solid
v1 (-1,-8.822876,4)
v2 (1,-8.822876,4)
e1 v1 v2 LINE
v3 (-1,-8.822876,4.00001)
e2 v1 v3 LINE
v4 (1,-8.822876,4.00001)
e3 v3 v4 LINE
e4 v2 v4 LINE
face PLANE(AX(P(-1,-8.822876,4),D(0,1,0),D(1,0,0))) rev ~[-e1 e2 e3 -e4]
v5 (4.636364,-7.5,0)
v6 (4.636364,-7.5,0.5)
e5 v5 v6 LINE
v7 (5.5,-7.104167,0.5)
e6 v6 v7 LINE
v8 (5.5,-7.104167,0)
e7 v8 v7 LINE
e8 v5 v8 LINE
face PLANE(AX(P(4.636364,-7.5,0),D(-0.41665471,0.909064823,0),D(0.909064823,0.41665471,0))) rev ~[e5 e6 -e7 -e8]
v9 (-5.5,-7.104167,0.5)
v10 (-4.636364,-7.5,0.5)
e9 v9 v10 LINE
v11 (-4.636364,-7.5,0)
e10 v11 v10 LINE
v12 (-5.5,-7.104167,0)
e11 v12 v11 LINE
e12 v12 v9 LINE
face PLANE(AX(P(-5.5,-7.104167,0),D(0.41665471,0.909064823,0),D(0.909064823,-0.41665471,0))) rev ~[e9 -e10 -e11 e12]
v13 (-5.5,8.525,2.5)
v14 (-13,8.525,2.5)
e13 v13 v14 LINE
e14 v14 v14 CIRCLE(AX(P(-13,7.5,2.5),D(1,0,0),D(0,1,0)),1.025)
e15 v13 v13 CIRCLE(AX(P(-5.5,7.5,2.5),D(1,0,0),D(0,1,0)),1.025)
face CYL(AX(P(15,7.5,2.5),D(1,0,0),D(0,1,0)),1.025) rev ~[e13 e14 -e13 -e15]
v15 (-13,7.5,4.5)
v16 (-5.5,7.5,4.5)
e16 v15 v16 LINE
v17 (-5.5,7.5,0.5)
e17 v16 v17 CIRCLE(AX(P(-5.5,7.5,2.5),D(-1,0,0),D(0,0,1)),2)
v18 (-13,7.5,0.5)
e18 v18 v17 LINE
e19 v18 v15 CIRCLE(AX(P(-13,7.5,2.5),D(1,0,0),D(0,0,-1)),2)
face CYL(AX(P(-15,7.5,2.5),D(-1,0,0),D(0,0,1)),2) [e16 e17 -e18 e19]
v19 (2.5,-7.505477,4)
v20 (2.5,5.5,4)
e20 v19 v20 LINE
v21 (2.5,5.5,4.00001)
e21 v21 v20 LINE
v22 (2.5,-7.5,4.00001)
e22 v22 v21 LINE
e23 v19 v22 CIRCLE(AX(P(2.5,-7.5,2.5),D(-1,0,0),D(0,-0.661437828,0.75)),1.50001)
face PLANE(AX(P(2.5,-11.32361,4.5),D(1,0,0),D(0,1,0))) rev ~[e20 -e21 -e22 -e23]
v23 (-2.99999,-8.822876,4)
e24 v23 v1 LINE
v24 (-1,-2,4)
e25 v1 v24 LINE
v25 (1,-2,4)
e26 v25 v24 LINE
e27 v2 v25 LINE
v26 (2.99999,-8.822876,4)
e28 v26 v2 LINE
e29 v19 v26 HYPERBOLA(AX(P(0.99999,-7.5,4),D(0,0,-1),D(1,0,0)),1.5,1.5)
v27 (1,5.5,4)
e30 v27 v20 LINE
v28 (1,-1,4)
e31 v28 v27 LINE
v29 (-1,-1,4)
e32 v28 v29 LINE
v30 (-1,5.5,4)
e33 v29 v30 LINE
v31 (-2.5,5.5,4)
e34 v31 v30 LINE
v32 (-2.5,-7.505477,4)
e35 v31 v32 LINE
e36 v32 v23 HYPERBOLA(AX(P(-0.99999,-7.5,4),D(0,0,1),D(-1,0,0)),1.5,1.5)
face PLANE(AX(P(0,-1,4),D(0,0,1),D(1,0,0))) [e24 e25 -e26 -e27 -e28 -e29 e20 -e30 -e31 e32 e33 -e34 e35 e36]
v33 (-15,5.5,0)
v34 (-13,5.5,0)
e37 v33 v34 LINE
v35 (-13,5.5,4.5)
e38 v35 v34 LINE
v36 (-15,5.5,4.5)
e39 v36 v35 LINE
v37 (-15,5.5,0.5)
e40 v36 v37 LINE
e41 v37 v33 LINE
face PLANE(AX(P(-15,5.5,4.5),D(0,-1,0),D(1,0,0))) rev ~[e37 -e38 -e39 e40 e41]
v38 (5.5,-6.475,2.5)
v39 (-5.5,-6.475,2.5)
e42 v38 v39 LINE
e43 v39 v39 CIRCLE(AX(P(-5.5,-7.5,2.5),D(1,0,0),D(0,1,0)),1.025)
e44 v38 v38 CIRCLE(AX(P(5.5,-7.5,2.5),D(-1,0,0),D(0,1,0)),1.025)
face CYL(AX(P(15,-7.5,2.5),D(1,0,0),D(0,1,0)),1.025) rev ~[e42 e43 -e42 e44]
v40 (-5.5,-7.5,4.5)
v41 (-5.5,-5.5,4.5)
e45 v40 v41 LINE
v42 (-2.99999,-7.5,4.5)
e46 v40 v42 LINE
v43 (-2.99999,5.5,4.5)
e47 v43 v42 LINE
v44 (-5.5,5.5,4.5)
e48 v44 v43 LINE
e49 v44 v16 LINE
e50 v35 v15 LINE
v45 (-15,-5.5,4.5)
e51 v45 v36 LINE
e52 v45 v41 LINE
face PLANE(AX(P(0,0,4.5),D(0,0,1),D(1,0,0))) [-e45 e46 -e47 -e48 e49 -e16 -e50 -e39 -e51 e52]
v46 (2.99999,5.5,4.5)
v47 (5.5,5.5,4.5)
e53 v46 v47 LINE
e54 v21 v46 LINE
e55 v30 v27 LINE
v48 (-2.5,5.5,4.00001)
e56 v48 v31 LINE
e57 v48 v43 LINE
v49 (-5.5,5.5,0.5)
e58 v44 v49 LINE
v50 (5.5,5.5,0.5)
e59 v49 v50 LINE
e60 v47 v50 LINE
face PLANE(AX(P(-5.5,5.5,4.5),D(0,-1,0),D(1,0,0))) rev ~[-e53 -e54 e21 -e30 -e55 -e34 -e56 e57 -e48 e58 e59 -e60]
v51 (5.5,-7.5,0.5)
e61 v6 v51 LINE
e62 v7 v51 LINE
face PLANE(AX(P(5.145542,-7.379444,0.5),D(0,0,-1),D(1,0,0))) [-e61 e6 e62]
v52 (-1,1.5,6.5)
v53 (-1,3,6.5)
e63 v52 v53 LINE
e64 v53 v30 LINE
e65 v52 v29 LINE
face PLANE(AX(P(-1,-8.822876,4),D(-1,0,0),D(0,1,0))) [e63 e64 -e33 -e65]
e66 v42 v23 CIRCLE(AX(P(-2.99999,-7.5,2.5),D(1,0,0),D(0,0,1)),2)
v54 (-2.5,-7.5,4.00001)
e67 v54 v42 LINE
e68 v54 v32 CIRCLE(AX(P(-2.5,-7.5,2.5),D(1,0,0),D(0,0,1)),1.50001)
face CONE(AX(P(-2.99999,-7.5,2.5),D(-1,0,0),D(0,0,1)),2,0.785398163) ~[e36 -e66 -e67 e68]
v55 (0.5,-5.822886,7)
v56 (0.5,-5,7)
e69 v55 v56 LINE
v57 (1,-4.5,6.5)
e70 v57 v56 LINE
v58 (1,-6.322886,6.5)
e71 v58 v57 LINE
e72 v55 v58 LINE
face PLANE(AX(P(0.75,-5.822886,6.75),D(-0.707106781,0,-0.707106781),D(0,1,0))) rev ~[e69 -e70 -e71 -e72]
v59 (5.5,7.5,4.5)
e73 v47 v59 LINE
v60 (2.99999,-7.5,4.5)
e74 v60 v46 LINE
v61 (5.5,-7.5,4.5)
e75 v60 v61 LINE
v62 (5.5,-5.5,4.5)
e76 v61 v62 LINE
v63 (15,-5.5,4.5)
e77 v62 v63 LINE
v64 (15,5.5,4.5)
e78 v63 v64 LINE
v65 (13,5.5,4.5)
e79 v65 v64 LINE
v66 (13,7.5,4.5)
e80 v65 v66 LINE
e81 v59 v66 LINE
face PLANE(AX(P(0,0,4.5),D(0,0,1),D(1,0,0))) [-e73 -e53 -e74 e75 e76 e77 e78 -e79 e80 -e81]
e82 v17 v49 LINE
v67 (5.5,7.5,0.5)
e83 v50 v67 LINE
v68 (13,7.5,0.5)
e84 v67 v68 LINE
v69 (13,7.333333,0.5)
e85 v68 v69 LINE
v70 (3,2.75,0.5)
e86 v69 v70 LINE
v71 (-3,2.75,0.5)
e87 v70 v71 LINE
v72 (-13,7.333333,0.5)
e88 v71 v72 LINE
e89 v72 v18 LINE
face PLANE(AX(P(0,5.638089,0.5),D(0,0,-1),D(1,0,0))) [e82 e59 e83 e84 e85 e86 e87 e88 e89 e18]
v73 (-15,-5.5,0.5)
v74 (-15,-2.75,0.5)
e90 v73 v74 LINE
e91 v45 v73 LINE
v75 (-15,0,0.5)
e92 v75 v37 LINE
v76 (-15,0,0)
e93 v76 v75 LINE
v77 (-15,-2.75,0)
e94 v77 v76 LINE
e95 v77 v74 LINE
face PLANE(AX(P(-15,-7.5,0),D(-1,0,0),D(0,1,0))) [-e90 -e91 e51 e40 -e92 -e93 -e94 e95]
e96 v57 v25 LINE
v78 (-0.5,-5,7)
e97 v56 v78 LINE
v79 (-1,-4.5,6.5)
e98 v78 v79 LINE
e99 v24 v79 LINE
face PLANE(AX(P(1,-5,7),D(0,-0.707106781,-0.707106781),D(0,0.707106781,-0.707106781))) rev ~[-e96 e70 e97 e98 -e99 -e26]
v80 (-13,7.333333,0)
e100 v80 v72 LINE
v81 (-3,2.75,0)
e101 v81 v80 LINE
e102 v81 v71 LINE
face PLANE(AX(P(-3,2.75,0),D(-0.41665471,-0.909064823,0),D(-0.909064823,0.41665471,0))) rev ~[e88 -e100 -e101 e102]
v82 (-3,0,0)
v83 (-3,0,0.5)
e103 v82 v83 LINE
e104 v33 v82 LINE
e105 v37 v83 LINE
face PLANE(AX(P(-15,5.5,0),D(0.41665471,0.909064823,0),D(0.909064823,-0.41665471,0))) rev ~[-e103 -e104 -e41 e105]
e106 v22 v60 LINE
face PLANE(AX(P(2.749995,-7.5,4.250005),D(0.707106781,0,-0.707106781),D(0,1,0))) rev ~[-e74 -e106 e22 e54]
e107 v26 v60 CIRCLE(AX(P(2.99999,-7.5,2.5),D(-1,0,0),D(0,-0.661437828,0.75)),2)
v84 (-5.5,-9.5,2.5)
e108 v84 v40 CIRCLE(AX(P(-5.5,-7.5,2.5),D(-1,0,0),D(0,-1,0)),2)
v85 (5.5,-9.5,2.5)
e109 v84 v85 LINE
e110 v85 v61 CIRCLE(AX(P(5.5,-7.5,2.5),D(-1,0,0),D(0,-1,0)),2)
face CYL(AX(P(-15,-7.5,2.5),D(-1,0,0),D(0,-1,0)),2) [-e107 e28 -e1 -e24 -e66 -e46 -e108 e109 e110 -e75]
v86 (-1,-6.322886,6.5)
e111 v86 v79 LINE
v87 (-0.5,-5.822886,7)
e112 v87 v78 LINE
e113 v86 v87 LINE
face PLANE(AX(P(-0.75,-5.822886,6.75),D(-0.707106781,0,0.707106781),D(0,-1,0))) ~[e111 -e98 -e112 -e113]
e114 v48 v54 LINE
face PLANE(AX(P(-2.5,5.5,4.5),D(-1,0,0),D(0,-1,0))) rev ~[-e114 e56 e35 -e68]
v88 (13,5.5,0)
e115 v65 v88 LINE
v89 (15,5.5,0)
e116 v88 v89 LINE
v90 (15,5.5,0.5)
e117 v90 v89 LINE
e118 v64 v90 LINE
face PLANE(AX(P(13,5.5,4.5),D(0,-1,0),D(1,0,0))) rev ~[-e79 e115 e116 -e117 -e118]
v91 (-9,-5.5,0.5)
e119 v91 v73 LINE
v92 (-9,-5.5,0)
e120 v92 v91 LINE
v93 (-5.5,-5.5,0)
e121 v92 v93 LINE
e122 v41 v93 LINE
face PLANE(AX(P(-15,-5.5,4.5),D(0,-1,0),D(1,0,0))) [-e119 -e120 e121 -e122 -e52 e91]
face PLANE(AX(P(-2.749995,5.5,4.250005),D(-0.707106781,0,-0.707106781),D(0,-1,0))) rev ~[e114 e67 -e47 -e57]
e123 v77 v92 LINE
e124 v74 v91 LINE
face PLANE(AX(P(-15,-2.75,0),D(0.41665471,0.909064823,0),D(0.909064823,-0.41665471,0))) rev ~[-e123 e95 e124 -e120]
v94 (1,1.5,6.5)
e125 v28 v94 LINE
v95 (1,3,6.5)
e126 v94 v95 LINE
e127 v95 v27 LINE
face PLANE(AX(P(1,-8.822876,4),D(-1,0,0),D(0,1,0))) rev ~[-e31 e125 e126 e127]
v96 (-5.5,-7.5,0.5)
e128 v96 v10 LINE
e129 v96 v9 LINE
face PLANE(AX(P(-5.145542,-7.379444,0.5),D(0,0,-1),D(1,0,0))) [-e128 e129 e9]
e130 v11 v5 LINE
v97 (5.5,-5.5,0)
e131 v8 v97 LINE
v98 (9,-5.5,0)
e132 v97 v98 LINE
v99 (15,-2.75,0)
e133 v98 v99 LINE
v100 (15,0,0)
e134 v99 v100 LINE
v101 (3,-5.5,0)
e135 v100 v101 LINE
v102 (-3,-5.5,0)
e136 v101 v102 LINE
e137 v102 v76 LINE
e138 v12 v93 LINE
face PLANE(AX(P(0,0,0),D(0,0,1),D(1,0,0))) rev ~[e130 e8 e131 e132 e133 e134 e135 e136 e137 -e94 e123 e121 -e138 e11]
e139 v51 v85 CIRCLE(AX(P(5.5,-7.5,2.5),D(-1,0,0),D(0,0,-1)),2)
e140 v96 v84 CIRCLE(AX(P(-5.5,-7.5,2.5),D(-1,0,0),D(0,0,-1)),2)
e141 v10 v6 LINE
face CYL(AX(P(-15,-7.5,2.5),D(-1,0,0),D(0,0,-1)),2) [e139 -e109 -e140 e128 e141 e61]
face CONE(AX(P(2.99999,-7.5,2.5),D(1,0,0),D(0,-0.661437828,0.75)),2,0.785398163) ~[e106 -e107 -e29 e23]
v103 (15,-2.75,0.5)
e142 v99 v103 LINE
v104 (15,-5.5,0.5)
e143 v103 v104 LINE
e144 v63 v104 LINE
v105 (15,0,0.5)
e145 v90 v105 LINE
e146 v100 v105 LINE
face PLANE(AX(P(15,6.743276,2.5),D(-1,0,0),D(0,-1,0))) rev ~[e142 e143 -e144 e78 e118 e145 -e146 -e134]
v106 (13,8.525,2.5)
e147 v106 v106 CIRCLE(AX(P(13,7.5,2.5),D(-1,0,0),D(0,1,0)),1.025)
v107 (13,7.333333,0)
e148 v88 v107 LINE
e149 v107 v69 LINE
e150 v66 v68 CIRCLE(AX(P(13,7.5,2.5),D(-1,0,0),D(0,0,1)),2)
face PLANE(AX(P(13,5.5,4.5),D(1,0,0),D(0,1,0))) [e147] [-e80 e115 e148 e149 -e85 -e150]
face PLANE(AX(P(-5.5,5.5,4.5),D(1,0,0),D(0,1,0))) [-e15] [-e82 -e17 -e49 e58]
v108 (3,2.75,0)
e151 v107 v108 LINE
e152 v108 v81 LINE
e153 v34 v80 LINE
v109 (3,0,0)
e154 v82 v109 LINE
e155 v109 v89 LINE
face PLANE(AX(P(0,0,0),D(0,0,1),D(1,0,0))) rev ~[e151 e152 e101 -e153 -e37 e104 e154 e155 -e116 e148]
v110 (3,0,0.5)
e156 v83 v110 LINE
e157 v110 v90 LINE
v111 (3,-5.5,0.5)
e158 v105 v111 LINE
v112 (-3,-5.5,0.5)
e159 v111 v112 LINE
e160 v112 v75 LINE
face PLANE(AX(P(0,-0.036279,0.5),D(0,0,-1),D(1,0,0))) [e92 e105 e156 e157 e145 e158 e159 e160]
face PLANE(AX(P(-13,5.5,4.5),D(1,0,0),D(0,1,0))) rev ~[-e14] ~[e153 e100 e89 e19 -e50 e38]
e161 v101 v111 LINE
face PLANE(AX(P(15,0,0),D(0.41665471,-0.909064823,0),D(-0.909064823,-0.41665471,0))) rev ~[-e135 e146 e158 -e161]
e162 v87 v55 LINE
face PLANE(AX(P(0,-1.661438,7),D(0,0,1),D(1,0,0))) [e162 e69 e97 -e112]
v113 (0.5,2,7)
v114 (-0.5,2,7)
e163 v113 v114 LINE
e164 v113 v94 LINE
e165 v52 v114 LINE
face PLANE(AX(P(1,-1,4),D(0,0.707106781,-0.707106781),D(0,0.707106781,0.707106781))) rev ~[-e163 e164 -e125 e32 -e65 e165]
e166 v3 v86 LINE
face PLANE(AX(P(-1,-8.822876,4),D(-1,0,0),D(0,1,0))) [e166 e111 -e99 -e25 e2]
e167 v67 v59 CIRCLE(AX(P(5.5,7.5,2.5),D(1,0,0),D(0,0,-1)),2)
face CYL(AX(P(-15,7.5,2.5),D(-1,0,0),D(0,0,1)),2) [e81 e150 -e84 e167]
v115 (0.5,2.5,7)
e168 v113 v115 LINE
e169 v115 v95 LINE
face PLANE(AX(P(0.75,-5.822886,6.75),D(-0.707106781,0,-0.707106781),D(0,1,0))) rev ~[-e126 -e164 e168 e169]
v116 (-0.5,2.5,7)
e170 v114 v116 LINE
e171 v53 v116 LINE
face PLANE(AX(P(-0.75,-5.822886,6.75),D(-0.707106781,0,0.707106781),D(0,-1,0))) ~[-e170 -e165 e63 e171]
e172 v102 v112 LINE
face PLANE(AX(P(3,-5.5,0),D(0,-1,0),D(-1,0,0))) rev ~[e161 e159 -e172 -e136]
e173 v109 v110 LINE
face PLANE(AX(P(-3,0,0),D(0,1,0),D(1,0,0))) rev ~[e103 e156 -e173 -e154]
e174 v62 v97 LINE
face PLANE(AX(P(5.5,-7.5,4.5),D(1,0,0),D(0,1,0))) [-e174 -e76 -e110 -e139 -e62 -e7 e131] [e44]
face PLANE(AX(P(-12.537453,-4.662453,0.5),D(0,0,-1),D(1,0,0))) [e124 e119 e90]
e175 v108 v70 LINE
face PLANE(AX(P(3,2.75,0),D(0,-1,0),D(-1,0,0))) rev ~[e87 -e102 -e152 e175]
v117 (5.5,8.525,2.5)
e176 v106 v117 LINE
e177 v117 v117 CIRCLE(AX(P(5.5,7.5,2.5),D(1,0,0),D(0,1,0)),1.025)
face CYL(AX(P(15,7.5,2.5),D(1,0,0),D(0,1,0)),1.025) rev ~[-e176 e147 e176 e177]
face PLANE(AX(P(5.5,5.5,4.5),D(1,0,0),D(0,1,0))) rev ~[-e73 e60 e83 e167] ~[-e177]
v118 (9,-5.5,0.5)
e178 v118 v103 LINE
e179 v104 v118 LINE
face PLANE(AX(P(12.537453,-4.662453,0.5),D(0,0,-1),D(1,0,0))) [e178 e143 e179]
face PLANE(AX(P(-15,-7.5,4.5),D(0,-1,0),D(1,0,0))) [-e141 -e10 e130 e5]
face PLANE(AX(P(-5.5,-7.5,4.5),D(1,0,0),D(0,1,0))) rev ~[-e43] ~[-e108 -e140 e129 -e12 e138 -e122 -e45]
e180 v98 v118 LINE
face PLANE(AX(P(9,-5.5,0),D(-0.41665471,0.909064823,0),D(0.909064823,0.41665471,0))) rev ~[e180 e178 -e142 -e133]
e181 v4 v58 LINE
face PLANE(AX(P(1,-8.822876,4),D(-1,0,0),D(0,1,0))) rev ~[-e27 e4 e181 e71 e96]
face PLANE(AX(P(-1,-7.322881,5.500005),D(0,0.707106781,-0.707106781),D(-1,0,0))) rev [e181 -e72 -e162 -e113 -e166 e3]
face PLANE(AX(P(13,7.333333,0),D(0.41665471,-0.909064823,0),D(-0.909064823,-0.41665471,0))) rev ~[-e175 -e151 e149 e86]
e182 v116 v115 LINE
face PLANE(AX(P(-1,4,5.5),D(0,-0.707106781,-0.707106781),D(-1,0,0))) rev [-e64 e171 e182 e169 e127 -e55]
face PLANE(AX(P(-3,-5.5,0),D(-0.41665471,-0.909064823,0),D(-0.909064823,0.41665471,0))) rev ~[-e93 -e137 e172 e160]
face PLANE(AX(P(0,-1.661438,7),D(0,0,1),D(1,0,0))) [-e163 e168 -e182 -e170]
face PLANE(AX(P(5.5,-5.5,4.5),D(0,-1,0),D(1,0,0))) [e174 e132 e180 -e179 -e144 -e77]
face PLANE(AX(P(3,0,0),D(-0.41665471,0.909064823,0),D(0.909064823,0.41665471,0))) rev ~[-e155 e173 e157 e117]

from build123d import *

# Parameters (mm, degrees)
F0_W      = 30
F0_H      = 15
F1_DEPTH  = 4.5
F3_DEPTH  = 30
F4_W      = 9.5
F4_H      = 2
F4_W_2    = 2
F4_W_3    = 11
F5_DEPTH  = 25
F6_R      = 1.025
F7_DEPTH  = 30
F8_W      = 9.5
F8_H      = 2
F9_DEPTH  = 25
F10_W     = 11
F10_H     = 2
F11_DEPTH = 25
F12_W     = 2
F12_H     = 2
F13_DEPTH = 25
F15_DEPTH = 0.5
F16_W     = 5
F16_H     = 13
F16_H_2   = 3.8236103207
F17_DEPTH = 0.5
F18_W     = 2
F18_H     = 14.3228756555
F19_DEPTH = 3
F20_SIZE  = 2.99999
F21_SIZE  = 3
F22_SIZE  = 0.5
F23_SIZE  = 0.49999
F25_DEPTH = 3


# Not quite as in the source:
# - a fillet or chamfer is up to 0.001 mm smaller than in the source, because OpenCascade refuses the exact size
# - a feature names something its author has since deleted; it is built from what else it names


with BuildPart() as f1:
    # F0 (on Top) → F1 (new body)
    with BuildSketch(Plane.XY):
        Rectangle(F0_W, F0_H)
    extrude(amount=F1_DEPTH)

    # F2 (on face) → F3 (join)
    with BuildSketch(Plane(origin=(-15, 0, 0), x_dir=(0, -1, 0), z_dir=(-1, 0, 0))):
        with BuildLine():
            ThreePointArc((-7.5, 0.5), (-6.0857864376, 1.0857864376), (-5.5, 2.5))
            ThreePointArc((-5.5, 2.5), (-6.0857864376, 3.9142135624), (-7.5, 4.5))
            Line((-7.5, 4.5), (-7.5, 0.5))
        make_face()
        with BuildLine():
            Line((-7.5, 0.5), (-7.5, 4.5))
            ThreePointArc((-7.5, 4.5), (-9.5, 2.5), (-7.5, 0.5))
        make_face()
        with BuildLine():
            ThreePointArc((9.5, 2.5), (8.9142135624, 3.9142135624), (7.5, 4.5))
            Line((7.5, 4.5), (7.5, 0.5))
            ThreePointArc((7.5, 0.5), (8.9142135624, 1.0857864376), (9.5, 2.5))
        make_face()
    extrude(amount=-F3_DEPTH)

    # F4 (on face) → F5 (cut)
    with BuildSketch(Plane.XY.offset(4.5)):
        with Locations((-10.25, -8.5)):
            Rectangle(F4_W, F4_H)
        with Locations((10.25, -8.5)):
            Rectangle(F4_W, F4_H)
        with Locations((-14, 8.5)):
            Rectangle(F4_W_2, F4_H)
        with Locations((14, 8.5)):
            Rectangle(F4_W_2, F4_H)
        with Locations((0, 8.5)):
            Rectangle(F4_W_3, F4_H)
    extrude(amount=-F5_DEPTH, mode=Mode.SUBTRACT)

    # F6 (on face) → F7 (cut)
    with BuildSketch(Plane.YZ.offset(15)):
        with Locations((-7.5, 2.5)):
            Circle(F6_R)
        with Locations((7.5, 2.5)):
            Circle(F6_R)
    extrude(amount=-F7_DEPTH, mode=Mode.SUBTRACT)

    # F8 (on face) → F9 (cut)
    with BuildSketch(Plane.XY.offset(4.5)):
        with Locations((-10.25, -6.5)):
            Rectangle(F8_W, F8_H)
        with Locations((10.25, -6.5)):
            Rectangle(F8_W, F8_H)
    extrude(amount=-F9_DEPTH, mode=Mode.SUBTRACT)

    # F10 (on face) → F11 (cut)
    with BuildSketch(Plane.XY.offset(4.5)):
        with Locations((0, 6.5)):
            Rectangle(F10_W, F10_H)
    extrude(amount=-F11_DEPTH, mode=Mode.SUBTRACT)

    # F12 (on face) → F13 (cut)
    with BuildSketch(Plane.XY.offset(4.5)):
        with Locations((-14, 6.5)):
            Rectangle(F12_W, F12_H)
        with Locations((14, 6.5)):
            Rectangle(F12_W, F12_H)
    extrude(amount=-F13_DEPTH, mode=Mode.SUBTRACT)

    # F14 (on face) → F15 (cut)
    with BuildSketch(Plane(origin=(0, 0, 0), x_dir=(1, 0, 0), z_dir=(0, 0, -1))):
        Polygon((3, 5.5), (0, 5.5), (-3, 5.5), (-15, 0), (-15, -5.5), (-3, 0), (3, 0), (15, -5.5), (15, 0), align=None)
        Polygon((-15, 5.5), (-15, 2.75), (-9, 5.5), align=None)
        Polygon((9, 5.5), (15, 2.75), (15, 5.5), align=None)
        Polygon((-3, -2.75), (-13, -7.3333333333), (-13, -7.5), (-5.5, -7.5), (-5.5, -5.5), (5.5, -5.5), (5.5, -7.5), (13, -7.5), (13, -7.3333333333), (3, -2.75), align=None)
        Polygon((-5.5, 7.5), (-5.5, 7.1041666667), (-4.6363636364, 7.5), align=None)
        Polygon((4.6363636364, 7.5), (5.5, 7.1041666667), (5.5, 7.5), align=None)
    extrude(amount=-F15_DEPTH, mode=Mode.SUBTRACT)

    # F16 (on face) → F17 (cut)
    with BuildSketch(Plane.XY.offset(4.5)):
        with Locations((0, -1)):
            Rectangle(F16_W, F16_H)
        with Locations((0, -9.4118051603)):
            Rectangle(F16_W, F16_H_2)
    extrude(amount=-F17_DEPTH, mode=Mode.SUBTRACT)

    # F18 (on face) → F19 (join)
    with BuildSketch(Plane.XY.offset(4)):
        with Locations((0, -1.6614378278)):
            Rectangle(F18_W, F18_H)
    extrude(amount=F19_DEPTH)

    # F20 (size 3 in the source; OpenCascade refuses exactly that, so slightly less here)
    f20_edges = [f1.edges().sort_by_distance(p)[0] for p in [
        (0, -8.822876, 7),
    ]]
    chamfer(f20_edges, length=F20_SIZE)

    # F21
    f21_edges = [f1.edges().sort_by_distance(p)[0] for p in [
        (0, 5.5, 7),
    ]]
    chamfer(f21_edges, length=F21_SIZE)

    # F22
    f22_edges = [f1.edges().sort_by_distance(p)[0] for p in [
        (-1, -1.661443, 7),
        (1, -1.661443, 7),
    ]]
    chamfer(f22_edges, length=F22_SIZE)

    # F23 (size 0.5 in the source; OpenCascade refuses exactly that, so slightly less here)
    f23_edges = [f1.edges().sort_by_distance(p)[0] for p in [
        (2.5, -1, 4.5),
        (-2.5, -1, 4.5),
    ]]
    chamfer(f23_edges, length=F23_SIZE)

    # F24 (on face) → F25 (cut)
    with BuildSketch(Plane.YZ.offset(1)):
        Polygon((-5, 7), (-4.5, 6.5), (1.5, 6.5), (2, 7), align=None)
        Polygon((-4.5, 6.5), (-2, 4), (-1.5, 4), (-1, 4), (1.5, 6.5), align=None)
    extrude(amount=-F25_DEPTH, mode=Mode.SUBTRACT)


solid = f1.part
